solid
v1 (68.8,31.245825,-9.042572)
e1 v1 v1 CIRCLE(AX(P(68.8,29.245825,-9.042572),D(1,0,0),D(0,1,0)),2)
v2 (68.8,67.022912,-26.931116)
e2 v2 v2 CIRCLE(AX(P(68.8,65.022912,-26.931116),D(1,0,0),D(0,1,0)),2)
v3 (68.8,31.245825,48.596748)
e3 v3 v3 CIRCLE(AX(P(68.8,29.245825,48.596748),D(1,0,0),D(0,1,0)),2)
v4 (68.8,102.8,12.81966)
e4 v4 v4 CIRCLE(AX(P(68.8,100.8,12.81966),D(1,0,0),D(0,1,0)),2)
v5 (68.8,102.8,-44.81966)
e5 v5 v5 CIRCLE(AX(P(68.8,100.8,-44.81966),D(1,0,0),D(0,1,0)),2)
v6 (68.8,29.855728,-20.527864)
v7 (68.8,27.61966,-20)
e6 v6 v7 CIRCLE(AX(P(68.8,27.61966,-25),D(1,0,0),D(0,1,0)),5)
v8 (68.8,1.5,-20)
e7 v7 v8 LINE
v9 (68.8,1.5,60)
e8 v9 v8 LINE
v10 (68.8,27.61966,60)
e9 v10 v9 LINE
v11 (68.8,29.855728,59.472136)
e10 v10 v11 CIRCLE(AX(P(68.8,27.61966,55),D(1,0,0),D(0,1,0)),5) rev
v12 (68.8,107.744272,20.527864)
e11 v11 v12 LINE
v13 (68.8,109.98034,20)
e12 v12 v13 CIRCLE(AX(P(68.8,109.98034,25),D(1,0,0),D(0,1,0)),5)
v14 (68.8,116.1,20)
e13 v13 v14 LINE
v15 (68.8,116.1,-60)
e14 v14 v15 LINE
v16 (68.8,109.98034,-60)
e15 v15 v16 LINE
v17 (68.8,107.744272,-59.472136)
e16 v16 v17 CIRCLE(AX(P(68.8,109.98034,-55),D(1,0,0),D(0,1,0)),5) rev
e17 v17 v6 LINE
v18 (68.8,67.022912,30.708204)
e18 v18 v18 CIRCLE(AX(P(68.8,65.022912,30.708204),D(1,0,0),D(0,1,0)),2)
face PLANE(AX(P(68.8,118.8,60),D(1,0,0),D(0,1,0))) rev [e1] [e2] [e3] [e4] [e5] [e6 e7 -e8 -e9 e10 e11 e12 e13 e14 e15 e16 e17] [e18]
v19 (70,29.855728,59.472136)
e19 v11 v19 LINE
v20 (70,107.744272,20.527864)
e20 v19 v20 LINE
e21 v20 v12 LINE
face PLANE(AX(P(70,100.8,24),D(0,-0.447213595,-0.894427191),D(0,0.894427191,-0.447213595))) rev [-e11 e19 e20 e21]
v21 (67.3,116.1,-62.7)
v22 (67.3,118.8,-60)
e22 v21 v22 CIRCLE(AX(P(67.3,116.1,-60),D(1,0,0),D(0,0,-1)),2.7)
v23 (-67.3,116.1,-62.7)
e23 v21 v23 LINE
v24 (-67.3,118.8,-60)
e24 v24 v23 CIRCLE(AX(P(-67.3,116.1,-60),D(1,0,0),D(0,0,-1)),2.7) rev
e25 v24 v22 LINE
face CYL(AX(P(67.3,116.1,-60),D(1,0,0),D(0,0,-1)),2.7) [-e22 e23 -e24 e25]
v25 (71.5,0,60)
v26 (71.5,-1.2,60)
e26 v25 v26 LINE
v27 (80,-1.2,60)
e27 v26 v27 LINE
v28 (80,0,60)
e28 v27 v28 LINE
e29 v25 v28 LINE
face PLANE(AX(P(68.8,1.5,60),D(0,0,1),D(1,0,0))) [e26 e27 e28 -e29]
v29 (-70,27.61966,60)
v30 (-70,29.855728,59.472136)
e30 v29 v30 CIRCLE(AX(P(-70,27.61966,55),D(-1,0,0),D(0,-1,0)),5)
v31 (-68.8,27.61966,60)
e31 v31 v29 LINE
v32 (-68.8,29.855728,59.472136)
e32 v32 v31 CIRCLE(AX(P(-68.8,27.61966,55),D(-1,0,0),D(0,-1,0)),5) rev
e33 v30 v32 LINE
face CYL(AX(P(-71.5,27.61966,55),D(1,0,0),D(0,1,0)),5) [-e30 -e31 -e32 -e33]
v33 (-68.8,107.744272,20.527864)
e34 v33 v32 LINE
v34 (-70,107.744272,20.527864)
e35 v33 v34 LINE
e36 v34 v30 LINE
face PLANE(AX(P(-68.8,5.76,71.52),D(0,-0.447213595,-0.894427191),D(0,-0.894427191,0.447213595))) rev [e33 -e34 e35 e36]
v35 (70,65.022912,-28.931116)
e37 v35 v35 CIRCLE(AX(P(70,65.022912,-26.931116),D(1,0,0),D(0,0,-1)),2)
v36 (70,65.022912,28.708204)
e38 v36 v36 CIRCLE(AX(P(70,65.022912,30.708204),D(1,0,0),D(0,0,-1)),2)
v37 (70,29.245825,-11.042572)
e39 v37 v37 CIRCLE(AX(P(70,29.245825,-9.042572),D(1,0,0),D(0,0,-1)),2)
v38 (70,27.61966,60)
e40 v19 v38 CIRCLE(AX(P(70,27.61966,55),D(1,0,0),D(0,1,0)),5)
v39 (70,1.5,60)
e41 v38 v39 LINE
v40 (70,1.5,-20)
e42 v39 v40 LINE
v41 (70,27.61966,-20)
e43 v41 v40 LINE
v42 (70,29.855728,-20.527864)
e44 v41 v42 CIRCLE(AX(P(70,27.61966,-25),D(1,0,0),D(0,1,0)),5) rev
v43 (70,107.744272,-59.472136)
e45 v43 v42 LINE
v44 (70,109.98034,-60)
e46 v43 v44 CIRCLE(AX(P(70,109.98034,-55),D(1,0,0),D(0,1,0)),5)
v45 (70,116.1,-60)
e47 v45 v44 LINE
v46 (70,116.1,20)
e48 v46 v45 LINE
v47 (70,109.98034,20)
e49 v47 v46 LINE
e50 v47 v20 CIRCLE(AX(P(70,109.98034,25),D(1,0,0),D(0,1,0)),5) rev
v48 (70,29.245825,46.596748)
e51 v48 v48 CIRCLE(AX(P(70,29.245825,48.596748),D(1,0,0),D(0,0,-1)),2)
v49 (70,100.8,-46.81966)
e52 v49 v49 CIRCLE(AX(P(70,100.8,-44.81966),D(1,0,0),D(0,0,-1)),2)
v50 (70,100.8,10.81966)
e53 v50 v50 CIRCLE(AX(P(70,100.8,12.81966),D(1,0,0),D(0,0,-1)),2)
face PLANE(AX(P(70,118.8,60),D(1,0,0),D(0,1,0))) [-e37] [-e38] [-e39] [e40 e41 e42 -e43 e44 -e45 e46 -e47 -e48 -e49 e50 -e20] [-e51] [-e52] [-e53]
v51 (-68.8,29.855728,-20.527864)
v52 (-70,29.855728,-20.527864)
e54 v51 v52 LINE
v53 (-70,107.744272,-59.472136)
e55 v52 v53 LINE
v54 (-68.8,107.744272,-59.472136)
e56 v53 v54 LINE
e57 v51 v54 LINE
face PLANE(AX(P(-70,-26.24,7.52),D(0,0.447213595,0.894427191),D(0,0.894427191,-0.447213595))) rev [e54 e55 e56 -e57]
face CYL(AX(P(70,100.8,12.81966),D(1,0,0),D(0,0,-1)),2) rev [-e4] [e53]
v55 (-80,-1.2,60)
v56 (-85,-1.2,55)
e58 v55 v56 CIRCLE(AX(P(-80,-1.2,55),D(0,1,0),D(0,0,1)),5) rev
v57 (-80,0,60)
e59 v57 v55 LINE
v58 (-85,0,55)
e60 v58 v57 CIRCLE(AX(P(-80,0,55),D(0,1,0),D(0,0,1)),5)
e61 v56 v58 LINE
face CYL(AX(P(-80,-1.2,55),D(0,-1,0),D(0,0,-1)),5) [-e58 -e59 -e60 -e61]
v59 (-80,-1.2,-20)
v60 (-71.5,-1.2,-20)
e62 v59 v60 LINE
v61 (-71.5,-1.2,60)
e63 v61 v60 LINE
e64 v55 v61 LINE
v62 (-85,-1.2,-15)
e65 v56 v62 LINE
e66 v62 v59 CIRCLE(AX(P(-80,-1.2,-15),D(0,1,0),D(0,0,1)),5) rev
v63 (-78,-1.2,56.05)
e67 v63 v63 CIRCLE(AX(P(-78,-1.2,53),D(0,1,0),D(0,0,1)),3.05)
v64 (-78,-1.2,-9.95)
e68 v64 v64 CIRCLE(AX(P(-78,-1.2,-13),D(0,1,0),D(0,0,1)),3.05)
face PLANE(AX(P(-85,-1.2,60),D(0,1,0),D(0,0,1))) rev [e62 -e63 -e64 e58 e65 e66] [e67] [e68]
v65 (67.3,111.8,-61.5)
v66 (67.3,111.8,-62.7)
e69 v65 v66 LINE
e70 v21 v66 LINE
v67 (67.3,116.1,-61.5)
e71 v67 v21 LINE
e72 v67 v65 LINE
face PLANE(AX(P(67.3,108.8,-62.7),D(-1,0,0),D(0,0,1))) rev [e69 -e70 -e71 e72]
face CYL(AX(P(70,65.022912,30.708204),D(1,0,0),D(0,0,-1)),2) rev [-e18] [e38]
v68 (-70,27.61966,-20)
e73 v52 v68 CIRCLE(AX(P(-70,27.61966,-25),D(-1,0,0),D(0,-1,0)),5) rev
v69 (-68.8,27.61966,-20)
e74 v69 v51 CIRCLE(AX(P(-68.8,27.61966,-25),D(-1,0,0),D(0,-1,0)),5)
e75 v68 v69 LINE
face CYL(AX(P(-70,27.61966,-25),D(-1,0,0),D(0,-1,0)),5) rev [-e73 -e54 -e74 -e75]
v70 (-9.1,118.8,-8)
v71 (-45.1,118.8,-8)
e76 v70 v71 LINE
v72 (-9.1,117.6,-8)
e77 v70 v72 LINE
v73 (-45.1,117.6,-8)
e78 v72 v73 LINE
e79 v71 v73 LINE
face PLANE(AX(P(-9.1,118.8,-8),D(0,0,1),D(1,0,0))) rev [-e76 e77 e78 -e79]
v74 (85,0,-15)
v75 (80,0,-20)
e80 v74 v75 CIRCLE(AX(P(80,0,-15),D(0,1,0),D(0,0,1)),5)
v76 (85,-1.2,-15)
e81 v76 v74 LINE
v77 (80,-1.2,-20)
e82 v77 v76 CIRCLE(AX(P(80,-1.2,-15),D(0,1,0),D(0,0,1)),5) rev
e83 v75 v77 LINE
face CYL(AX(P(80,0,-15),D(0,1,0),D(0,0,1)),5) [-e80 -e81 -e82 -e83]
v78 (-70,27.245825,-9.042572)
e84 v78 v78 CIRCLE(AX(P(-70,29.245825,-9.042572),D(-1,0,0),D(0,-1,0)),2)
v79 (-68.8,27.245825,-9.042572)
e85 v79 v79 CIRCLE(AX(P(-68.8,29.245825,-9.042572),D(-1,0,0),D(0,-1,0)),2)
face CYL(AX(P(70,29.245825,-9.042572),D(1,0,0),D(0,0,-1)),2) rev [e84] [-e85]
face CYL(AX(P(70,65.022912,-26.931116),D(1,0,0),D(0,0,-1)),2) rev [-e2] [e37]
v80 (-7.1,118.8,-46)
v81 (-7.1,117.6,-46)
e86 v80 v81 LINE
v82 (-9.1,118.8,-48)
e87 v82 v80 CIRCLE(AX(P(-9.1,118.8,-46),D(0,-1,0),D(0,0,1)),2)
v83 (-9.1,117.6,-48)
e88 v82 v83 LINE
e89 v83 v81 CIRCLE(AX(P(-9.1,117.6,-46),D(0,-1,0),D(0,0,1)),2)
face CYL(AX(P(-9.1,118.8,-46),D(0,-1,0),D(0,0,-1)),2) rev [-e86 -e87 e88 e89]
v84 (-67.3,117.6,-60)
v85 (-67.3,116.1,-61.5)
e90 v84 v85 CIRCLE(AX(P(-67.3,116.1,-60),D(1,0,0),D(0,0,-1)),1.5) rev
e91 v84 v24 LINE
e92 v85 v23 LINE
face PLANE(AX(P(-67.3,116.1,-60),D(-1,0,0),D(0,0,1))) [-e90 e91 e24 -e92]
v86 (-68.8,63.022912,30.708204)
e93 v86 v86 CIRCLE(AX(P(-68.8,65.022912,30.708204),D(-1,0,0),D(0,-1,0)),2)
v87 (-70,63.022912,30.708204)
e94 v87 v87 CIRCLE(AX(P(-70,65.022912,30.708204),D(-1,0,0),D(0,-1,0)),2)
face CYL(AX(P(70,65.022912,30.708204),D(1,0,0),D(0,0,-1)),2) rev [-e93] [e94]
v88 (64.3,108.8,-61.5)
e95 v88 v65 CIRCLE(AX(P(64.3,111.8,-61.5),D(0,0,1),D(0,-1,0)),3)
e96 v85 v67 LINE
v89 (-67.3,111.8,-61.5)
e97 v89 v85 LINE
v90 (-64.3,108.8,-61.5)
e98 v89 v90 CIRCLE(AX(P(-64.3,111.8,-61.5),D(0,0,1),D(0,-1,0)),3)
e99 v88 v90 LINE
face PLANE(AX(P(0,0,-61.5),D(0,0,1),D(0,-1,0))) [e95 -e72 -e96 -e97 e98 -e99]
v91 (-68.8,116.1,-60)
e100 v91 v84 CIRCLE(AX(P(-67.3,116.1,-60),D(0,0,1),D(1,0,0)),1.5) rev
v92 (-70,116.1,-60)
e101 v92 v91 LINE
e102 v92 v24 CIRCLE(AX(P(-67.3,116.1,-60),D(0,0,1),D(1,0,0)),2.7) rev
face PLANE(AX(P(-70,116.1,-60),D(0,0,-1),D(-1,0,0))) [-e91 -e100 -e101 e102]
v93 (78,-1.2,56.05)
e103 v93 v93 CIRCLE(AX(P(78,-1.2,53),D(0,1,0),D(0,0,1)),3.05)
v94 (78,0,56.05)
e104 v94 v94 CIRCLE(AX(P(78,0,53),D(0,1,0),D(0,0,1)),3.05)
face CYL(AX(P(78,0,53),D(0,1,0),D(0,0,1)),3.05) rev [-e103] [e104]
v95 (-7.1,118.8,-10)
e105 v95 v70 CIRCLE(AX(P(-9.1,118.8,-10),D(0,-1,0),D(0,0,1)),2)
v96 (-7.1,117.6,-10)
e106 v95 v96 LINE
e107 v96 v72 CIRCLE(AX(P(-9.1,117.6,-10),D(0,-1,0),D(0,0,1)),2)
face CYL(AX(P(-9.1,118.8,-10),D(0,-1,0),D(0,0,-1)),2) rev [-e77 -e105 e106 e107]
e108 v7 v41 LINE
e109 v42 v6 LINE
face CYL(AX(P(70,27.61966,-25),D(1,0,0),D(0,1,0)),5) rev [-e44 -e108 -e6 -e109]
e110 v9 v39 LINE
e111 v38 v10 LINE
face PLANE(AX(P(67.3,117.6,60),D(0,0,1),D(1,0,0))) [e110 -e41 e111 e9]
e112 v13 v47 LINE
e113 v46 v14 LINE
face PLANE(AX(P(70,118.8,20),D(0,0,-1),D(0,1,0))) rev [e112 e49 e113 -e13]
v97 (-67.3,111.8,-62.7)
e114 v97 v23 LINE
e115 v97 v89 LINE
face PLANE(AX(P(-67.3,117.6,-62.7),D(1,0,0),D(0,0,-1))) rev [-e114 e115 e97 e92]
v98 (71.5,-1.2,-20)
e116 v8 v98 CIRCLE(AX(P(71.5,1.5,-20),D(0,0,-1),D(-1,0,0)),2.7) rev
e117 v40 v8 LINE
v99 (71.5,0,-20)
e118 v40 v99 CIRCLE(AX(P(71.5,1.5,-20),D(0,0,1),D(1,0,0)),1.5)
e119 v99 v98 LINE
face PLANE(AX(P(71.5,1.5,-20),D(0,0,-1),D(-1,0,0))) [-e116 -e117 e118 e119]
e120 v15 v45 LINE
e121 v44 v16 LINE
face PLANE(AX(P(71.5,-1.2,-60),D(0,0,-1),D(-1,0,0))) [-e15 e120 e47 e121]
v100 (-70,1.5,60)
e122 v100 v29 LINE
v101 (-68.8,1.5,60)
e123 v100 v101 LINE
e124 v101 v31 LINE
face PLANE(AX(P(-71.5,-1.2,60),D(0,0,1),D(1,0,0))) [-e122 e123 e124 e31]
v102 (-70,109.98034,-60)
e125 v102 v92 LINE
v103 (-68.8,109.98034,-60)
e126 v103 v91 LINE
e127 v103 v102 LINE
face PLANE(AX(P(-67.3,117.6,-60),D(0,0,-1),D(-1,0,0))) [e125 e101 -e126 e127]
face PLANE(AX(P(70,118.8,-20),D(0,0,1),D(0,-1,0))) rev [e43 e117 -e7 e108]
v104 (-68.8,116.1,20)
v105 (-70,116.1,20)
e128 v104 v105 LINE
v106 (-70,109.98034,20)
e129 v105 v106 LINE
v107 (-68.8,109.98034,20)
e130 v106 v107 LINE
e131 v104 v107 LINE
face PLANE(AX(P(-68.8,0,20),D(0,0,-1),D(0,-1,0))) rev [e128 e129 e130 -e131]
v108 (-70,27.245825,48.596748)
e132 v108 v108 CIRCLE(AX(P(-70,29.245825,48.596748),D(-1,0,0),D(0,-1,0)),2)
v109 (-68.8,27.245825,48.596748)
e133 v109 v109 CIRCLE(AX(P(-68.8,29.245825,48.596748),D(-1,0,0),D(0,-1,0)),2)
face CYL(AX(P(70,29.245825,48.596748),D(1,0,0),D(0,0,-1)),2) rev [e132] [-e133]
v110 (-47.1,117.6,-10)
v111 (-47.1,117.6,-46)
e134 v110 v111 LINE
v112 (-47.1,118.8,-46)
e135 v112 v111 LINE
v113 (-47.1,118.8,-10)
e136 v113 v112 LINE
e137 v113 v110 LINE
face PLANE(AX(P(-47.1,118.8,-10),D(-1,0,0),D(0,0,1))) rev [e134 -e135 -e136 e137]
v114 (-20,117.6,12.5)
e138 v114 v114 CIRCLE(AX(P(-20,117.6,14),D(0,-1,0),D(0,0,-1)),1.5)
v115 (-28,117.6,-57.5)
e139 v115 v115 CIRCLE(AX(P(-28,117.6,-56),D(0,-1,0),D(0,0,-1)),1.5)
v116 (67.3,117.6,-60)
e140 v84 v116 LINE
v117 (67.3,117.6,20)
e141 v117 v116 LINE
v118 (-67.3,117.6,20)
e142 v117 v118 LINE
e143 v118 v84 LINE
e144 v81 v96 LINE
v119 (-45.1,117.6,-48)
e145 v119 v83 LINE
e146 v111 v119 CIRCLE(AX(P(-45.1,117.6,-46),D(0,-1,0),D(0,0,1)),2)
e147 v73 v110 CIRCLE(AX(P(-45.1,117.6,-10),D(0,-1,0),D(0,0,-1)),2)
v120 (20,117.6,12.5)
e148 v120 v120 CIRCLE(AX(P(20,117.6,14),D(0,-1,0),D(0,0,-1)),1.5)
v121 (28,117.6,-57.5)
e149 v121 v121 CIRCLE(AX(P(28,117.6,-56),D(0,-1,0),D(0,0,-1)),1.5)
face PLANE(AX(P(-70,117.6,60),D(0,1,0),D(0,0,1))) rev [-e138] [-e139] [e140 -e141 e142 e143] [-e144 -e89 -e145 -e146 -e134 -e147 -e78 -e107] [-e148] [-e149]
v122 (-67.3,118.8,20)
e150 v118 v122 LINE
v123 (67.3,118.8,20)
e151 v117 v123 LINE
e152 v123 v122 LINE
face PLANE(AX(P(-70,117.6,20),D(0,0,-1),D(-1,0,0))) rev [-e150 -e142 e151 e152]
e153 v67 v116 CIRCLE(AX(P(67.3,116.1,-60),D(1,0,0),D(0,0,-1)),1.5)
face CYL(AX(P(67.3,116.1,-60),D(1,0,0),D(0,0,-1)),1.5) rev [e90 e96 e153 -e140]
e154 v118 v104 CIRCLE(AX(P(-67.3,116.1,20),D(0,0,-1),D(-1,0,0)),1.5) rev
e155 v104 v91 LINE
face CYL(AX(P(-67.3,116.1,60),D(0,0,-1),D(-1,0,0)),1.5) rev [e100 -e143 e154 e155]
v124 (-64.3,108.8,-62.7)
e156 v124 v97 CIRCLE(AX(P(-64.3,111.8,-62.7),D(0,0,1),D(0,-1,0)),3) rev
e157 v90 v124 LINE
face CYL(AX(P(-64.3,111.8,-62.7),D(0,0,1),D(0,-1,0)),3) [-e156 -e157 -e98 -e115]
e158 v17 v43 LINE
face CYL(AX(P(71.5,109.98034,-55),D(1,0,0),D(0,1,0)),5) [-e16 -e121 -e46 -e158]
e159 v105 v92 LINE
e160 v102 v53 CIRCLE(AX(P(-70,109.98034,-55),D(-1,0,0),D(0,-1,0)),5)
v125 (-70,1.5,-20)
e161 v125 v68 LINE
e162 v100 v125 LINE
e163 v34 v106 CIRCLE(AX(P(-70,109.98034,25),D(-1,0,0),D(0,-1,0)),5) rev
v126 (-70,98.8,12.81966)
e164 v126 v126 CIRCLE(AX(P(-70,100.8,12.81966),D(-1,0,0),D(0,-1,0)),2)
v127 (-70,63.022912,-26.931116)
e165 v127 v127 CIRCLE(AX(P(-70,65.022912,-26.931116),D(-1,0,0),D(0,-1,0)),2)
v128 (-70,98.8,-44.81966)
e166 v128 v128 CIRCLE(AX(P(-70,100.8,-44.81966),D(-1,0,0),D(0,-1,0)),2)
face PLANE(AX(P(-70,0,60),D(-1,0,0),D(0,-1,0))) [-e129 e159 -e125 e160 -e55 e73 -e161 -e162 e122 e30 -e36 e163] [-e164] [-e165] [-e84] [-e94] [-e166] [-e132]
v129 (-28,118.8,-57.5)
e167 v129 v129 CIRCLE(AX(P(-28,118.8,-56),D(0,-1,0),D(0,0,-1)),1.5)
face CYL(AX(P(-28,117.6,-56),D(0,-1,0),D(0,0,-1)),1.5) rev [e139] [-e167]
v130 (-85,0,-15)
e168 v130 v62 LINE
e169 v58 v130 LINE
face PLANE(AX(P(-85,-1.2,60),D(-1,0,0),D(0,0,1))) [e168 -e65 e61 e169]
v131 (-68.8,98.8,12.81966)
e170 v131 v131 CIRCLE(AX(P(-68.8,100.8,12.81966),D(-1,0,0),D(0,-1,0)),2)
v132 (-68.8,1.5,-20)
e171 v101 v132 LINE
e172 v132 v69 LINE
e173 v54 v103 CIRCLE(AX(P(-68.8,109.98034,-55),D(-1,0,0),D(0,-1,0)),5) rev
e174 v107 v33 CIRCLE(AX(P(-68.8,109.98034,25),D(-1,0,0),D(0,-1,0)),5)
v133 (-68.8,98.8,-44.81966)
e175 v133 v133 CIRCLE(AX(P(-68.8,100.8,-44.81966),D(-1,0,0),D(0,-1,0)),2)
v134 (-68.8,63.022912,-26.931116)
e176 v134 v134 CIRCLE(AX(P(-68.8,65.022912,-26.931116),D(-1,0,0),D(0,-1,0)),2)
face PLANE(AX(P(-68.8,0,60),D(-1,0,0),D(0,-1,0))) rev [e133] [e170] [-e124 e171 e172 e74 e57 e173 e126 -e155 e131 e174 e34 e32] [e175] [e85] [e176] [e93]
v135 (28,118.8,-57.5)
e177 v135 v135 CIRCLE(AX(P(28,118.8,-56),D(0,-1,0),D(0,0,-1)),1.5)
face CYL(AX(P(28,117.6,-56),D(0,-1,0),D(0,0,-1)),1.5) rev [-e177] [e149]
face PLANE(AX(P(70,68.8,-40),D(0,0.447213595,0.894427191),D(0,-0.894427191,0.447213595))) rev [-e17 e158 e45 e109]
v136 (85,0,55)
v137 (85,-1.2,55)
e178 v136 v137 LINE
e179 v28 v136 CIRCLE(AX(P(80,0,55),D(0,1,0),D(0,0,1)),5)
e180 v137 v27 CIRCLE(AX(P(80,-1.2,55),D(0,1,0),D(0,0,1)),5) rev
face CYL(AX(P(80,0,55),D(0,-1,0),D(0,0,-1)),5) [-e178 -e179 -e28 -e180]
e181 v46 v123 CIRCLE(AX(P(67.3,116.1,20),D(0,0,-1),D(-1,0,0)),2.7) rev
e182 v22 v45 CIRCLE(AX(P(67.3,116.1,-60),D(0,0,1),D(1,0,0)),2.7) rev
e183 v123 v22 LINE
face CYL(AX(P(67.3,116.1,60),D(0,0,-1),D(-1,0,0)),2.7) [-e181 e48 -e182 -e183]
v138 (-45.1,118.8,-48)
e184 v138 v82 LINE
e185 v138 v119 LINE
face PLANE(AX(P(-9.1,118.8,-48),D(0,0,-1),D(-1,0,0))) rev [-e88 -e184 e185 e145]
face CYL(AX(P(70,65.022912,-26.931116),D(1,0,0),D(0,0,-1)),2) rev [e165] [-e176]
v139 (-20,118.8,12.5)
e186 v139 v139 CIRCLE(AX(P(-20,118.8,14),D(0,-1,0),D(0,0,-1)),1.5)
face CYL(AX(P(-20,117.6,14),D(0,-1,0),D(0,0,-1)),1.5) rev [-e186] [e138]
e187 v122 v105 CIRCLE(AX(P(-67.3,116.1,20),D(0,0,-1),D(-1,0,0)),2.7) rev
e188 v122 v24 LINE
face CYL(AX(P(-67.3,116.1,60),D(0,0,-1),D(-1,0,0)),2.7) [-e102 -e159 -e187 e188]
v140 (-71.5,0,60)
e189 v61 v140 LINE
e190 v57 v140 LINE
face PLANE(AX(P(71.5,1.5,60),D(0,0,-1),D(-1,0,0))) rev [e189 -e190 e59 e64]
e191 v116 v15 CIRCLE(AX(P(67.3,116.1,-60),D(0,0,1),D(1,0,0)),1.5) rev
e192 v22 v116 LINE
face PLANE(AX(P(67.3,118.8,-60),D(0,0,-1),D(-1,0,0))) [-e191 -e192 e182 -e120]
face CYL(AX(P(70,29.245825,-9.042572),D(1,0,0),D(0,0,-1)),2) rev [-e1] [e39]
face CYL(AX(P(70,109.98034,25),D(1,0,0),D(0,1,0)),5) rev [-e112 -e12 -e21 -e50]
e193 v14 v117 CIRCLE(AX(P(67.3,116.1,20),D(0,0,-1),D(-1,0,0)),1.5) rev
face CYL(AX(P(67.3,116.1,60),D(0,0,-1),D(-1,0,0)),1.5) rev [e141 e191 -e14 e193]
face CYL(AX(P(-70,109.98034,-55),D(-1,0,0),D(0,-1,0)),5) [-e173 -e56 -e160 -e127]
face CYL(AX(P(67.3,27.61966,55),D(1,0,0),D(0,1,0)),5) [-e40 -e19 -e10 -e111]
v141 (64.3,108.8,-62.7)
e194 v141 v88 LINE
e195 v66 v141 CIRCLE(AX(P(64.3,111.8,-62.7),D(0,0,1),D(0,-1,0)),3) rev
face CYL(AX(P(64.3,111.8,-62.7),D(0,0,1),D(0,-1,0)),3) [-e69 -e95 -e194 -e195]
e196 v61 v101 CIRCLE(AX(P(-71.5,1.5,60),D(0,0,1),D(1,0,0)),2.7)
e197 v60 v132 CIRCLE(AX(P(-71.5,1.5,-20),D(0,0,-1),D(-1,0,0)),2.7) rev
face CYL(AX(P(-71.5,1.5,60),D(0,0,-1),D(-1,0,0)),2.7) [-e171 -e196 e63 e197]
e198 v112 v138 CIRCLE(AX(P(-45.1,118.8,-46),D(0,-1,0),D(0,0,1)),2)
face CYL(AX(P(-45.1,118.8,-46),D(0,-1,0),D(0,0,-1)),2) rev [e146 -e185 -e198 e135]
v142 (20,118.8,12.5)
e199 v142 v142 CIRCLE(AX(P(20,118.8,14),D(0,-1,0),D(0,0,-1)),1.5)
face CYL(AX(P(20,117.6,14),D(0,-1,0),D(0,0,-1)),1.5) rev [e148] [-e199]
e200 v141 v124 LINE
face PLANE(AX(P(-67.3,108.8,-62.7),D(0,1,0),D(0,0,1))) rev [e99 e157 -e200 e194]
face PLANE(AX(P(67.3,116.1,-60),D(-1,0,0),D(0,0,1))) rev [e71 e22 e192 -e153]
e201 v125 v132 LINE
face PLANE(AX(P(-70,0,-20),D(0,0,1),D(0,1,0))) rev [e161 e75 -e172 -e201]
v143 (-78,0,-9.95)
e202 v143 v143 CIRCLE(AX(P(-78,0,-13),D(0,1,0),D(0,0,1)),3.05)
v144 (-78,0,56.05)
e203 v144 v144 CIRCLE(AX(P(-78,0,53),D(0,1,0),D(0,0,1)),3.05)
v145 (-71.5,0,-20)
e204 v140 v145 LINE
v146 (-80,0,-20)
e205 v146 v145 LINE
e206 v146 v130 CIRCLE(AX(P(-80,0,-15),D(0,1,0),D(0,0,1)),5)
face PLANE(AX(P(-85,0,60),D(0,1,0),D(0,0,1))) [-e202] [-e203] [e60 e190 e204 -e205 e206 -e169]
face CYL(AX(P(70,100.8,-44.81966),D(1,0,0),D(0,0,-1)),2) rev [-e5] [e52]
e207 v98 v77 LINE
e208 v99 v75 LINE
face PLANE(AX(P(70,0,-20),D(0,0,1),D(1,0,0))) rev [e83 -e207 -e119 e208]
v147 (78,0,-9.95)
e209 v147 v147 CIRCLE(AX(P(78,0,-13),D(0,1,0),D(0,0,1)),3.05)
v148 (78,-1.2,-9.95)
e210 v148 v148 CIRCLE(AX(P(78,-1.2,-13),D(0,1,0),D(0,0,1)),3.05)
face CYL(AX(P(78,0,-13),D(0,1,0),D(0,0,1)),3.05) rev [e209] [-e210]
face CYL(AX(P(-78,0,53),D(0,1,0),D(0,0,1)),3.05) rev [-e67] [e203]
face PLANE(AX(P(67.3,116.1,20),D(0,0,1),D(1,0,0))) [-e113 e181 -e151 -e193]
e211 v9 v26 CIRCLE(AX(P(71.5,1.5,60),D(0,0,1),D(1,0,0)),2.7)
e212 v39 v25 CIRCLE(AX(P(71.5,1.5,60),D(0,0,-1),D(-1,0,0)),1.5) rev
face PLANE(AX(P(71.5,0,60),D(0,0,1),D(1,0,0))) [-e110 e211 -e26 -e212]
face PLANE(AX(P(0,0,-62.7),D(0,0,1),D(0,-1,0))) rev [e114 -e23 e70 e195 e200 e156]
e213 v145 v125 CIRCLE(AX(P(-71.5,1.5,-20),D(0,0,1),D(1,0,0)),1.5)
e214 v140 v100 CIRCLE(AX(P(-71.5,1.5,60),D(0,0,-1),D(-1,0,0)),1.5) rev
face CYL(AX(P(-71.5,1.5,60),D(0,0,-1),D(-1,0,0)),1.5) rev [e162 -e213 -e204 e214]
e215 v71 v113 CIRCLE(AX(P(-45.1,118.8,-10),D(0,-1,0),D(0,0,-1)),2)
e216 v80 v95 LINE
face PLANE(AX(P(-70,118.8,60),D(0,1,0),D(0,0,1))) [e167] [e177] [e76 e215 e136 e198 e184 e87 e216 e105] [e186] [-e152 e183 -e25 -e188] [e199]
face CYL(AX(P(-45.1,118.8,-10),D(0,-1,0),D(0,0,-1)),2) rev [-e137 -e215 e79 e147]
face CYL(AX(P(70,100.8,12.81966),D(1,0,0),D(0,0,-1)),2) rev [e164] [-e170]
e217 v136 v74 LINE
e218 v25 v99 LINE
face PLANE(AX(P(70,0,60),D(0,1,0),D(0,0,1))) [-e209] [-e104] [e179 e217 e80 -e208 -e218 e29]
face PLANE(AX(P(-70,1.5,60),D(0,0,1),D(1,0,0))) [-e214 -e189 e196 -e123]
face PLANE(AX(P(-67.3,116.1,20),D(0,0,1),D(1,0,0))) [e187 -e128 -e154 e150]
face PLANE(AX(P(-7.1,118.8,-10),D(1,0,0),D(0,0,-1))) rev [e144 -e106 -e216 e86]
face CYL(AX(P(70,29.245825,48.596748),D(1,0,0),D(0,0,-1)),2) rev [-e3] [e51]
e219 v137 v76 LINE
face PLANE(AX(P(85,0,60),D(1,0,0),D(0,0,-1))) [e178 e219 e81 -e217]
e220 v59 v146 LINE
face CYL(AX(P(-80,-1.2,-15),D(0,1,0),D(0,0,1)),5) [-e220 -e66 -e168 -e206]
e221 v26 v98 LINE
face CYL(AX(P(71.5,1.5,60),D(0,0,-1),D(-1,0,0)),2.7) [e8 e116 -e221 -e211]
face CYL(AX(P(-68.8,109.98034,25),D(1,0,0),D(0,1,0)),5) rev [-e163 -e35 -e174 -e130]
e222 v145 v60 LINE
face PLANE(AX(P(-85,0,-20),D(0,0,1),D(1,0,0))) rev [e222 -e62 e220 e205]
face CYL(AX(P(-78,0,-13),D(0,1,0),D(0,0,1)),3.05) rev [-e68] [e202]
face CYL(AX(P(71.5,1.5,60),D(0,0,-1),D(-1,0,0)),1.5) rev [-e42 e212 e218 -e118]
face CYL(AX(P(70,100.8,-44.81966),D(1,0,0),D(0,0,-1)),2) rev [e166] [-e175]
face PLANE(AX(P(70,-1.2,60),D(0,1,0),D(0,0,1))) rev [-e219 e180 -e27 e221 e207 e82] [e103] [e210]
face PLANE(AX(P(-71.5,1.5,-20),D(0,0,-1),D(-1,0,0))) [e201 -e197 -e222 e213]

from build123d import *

# Parameters (mm, degrees)
SM_BASE_FLANGE_1_DEPTH   = 60
CUT_EXTRUDE_1_DEPTH      = 158.919093209
CUT_EXTRUDE_1_DEPTH_BACK = 158.919093209
FILLET_1_R               = 5
SM_EDGE_FLANGE_1_DEPTH   = 134.6
HOLE_WIZARD_6_1_6_1_1_D  = 6.1
HOLE_WIZARD_3_0_3_1_D    = 3
CUT_EXTRUDE_2_DEPTH      = 10
HOLE_WIZARD_4_0_4_1_D    = 4
FILLET_2_R               = 3


# Sheet-metal steps are written as plain solids
with BuildPart() as part:
    # Sketch 1 → Базовая кромка1 (new, symmetric)
    with BuildSketch(Plane.XY):
        with BuildLine():
            Line((-85, 0), (-71.5, 0))
            ThreePointArc((-71.5, 0), (-70.439339828, 0.439339828), (-70, 1.5))
            Line((-70, 1.5), (-70, 116.1))
            ThreePointArc((-70, 116.1), (-69.209188309, 118.009188309), (-67.3, 118.8))
            Line((-67.3, 118.8), (67.3, 118.8))
            ThreePointArc((67.3, 118.8), (69.209188309, 118.009188309), (70, 116.1))
            Line((70, 116.1), (70, 1.5))
            ThreePointArc((70, 1.5), (70.439339828, 0.439339828), (71.5, 0))
            Line((71.5, 0), (85, 0))
            Line((85, 0), (85, -1.2))
            Line((85, -1.2), (71.5, -1.2))
            ThreePointArc((71.5, -1.2), (69.590811691, -0.409188309), (68.8, 1.5))
            Line((68.8, 1.5), (68.8, 116.1))
            ThreePointArc((68.8, 116.1), (68.360660172, 117.160660172), (67.3, 117.6))
            Line((67.3, 117.6), (-67.3, 117.6))
            ThreePointArc((-67.3, 117.6), (-68.360660172, 117.160660172), (-68.8, 116.1))
            Line((-68.8, 116.1), (-68.8, 1.5))
            ThreePointArc((-68.8, 1.5), (-69.590811691, -0.409188309), (-71.5, -1.2))
            Line((-71.5, -1.2), (-85, -1.2))
            Line((-85, -1.2), (-85, 0))
        make_face()
    extrude(amount=SM_BASE_FLANGE_1_DEPTH, both=True)

    # Эскиз6 → Вырез-Вытянуть1 (cut, two sides: drawn at the far end of the back side and taken through both)
    with BuildSketch(Plane(origin=(0, 0, 0), x_dir=(0, 0, -1), z_dir=(1, 0, 0)).offset(-CUT_EXTRUDE_1_DEPTH_BACK)):
        Polygon((-60, 28.8), (-20, 108.8), (-20, 118.8), (-60, 118.8), align=None)
        Polygon((60, 108.8), (20, 28.8), (20, -1.2), (60, -1.2), align=None)
    extrude(amount=CUT_EXTRUDE_1_DEPTH + CUT_EXTRUDE_1_DEPTH_BACK, mode=Mode.SUBTRACT)

    # Скругление1
    fillet_1_edges = [part.edges().sort_by_distance(p)[0] for p in [
        (-69.4, 108.8, -60),
        (-69.4, 28.8, -20),
        (-85, -0.6, -20),
        (69.4, 108.8, -60),
        (69.4, 28.8, -20),
        (85, -0.6, -20),
        (69.4, 28.8, 60),
        (69.4, 108.8, 20),
        (-69.4, 28.8, 60),
        (-69.4, 108.8, 20),
        (-85, -0.6, 60),
        (85, -0.6, 60),
    ]]
    fillet(fillet_1_edges, radius=FILLET_1_R)

    # Ребро-кромка1 section (across the edge) → Ребро-кромка1 (add)
    with BuildSketch(Plane(origin=(-67.3, 117.6, -61.5), x_dir=(0, 0, 1), z_dir=(1, 0, 0))):
        with BuildLine():
            Line((-1.2, 1.5), (-1.2, 8.8))
            Line((-1.2, 8.8), (0, 8.8))
            Line((0, 8.8), (0, 1.5))
            ThreePointArc((0, 1.5), (0.439339828, 0.439339828), (1.5, 0))
            Line((1.5, 0), (1.5, -1.2))
            ThreePointArc((1.5, -1.2), (-0.409188309, -0.409188309), (-1.2, 1.5))
        make_face()
    extrude(amount=SM_EDGE_FLANGE_1_DEPTH)

    # Диаметр отверстия Ø6.1 (6.1)1 (through all)
    with Locations(Plane(origin=(0, 0, 0), x_dir=(1, 0, 0), z_dir=(0, 1, 0))):
        with Locations((-78, 13), (-78, -53), (78, -53), (78, 13)):
            Hole(HOLE_WIZARD_6_1_6_1_1_D / 2)

    # Диаметр отверстия Ø3.0 (3)1 (through all)
    with Locations(Plane(origin=(0, 117.6, 0), x_dir=(-1, 0, 0), z_dir=(0, -1, 0))):
        with Locations((-20, -14), (-28, 56), (28, 56), (20, -14)):
            Hole(HOLE_WIZARD_3_0_3_1_D / 2)

    # Эскиз14 → Вырез-Вытянуть2 (cut)
    with BuildSketch(Plane.XZ.offset(-117.6)):
        with BuildLine():
            Line((-9.1, -8), (-45.1, -8))
            ThreePointArc((-45.1, -8), (-46.514213562, -8.585786438), (-47.1, -10))
            Line((-47.1, -10), (-47.1, -46))
            ThreePointArc((-47.1, -46), (-46.514213562, -47.414213562), (-45.1, -48))
            Line((-45.1, -48), (-9.1, -48))
            ThreePointArc((-9.1, -48), (-7.685786438, -47.414213562), (-7.1, -46))
            Line((-7.1, -46), (-7.1, -10))
            ThreePointArc((-7.1, -10), (-7.685786438, -8.585786438), (-9.1, -8))
        make_face()
    extrude(amount=-CUT_EXTRUDE_2_DEPTH, mode=Mode.SUBTRACT)

    # Диаметр отверстия Ø4.0 (4)1 (through all)
    with Locations(Plane(origin=(70, 0, 0), x_dir=(0, 0, -1), z_dir=(1, 0, 0))):
        with Locations((-12.819660113, 100.8), (44.819660113, 100.8), (26.931116293, 65.02291236), (-30.708203932, 65.02291236), (-48.596747752, 29.24582472), (9.042572473, 29.24582472)):
            Hole(HOLE_WIZARD_4_0_4_1_D / 2)

    # Скругление2
    fillet_2_edges = [part.edges().sort_by_distance(p)[0] for p in [
        (-67.3, 108.8, -62.1),
        (67.3, 108.8, -62.1),
    ]]
    fillet(fillet_2_edges, radius=FILLET_2_R)


solid = part.part
